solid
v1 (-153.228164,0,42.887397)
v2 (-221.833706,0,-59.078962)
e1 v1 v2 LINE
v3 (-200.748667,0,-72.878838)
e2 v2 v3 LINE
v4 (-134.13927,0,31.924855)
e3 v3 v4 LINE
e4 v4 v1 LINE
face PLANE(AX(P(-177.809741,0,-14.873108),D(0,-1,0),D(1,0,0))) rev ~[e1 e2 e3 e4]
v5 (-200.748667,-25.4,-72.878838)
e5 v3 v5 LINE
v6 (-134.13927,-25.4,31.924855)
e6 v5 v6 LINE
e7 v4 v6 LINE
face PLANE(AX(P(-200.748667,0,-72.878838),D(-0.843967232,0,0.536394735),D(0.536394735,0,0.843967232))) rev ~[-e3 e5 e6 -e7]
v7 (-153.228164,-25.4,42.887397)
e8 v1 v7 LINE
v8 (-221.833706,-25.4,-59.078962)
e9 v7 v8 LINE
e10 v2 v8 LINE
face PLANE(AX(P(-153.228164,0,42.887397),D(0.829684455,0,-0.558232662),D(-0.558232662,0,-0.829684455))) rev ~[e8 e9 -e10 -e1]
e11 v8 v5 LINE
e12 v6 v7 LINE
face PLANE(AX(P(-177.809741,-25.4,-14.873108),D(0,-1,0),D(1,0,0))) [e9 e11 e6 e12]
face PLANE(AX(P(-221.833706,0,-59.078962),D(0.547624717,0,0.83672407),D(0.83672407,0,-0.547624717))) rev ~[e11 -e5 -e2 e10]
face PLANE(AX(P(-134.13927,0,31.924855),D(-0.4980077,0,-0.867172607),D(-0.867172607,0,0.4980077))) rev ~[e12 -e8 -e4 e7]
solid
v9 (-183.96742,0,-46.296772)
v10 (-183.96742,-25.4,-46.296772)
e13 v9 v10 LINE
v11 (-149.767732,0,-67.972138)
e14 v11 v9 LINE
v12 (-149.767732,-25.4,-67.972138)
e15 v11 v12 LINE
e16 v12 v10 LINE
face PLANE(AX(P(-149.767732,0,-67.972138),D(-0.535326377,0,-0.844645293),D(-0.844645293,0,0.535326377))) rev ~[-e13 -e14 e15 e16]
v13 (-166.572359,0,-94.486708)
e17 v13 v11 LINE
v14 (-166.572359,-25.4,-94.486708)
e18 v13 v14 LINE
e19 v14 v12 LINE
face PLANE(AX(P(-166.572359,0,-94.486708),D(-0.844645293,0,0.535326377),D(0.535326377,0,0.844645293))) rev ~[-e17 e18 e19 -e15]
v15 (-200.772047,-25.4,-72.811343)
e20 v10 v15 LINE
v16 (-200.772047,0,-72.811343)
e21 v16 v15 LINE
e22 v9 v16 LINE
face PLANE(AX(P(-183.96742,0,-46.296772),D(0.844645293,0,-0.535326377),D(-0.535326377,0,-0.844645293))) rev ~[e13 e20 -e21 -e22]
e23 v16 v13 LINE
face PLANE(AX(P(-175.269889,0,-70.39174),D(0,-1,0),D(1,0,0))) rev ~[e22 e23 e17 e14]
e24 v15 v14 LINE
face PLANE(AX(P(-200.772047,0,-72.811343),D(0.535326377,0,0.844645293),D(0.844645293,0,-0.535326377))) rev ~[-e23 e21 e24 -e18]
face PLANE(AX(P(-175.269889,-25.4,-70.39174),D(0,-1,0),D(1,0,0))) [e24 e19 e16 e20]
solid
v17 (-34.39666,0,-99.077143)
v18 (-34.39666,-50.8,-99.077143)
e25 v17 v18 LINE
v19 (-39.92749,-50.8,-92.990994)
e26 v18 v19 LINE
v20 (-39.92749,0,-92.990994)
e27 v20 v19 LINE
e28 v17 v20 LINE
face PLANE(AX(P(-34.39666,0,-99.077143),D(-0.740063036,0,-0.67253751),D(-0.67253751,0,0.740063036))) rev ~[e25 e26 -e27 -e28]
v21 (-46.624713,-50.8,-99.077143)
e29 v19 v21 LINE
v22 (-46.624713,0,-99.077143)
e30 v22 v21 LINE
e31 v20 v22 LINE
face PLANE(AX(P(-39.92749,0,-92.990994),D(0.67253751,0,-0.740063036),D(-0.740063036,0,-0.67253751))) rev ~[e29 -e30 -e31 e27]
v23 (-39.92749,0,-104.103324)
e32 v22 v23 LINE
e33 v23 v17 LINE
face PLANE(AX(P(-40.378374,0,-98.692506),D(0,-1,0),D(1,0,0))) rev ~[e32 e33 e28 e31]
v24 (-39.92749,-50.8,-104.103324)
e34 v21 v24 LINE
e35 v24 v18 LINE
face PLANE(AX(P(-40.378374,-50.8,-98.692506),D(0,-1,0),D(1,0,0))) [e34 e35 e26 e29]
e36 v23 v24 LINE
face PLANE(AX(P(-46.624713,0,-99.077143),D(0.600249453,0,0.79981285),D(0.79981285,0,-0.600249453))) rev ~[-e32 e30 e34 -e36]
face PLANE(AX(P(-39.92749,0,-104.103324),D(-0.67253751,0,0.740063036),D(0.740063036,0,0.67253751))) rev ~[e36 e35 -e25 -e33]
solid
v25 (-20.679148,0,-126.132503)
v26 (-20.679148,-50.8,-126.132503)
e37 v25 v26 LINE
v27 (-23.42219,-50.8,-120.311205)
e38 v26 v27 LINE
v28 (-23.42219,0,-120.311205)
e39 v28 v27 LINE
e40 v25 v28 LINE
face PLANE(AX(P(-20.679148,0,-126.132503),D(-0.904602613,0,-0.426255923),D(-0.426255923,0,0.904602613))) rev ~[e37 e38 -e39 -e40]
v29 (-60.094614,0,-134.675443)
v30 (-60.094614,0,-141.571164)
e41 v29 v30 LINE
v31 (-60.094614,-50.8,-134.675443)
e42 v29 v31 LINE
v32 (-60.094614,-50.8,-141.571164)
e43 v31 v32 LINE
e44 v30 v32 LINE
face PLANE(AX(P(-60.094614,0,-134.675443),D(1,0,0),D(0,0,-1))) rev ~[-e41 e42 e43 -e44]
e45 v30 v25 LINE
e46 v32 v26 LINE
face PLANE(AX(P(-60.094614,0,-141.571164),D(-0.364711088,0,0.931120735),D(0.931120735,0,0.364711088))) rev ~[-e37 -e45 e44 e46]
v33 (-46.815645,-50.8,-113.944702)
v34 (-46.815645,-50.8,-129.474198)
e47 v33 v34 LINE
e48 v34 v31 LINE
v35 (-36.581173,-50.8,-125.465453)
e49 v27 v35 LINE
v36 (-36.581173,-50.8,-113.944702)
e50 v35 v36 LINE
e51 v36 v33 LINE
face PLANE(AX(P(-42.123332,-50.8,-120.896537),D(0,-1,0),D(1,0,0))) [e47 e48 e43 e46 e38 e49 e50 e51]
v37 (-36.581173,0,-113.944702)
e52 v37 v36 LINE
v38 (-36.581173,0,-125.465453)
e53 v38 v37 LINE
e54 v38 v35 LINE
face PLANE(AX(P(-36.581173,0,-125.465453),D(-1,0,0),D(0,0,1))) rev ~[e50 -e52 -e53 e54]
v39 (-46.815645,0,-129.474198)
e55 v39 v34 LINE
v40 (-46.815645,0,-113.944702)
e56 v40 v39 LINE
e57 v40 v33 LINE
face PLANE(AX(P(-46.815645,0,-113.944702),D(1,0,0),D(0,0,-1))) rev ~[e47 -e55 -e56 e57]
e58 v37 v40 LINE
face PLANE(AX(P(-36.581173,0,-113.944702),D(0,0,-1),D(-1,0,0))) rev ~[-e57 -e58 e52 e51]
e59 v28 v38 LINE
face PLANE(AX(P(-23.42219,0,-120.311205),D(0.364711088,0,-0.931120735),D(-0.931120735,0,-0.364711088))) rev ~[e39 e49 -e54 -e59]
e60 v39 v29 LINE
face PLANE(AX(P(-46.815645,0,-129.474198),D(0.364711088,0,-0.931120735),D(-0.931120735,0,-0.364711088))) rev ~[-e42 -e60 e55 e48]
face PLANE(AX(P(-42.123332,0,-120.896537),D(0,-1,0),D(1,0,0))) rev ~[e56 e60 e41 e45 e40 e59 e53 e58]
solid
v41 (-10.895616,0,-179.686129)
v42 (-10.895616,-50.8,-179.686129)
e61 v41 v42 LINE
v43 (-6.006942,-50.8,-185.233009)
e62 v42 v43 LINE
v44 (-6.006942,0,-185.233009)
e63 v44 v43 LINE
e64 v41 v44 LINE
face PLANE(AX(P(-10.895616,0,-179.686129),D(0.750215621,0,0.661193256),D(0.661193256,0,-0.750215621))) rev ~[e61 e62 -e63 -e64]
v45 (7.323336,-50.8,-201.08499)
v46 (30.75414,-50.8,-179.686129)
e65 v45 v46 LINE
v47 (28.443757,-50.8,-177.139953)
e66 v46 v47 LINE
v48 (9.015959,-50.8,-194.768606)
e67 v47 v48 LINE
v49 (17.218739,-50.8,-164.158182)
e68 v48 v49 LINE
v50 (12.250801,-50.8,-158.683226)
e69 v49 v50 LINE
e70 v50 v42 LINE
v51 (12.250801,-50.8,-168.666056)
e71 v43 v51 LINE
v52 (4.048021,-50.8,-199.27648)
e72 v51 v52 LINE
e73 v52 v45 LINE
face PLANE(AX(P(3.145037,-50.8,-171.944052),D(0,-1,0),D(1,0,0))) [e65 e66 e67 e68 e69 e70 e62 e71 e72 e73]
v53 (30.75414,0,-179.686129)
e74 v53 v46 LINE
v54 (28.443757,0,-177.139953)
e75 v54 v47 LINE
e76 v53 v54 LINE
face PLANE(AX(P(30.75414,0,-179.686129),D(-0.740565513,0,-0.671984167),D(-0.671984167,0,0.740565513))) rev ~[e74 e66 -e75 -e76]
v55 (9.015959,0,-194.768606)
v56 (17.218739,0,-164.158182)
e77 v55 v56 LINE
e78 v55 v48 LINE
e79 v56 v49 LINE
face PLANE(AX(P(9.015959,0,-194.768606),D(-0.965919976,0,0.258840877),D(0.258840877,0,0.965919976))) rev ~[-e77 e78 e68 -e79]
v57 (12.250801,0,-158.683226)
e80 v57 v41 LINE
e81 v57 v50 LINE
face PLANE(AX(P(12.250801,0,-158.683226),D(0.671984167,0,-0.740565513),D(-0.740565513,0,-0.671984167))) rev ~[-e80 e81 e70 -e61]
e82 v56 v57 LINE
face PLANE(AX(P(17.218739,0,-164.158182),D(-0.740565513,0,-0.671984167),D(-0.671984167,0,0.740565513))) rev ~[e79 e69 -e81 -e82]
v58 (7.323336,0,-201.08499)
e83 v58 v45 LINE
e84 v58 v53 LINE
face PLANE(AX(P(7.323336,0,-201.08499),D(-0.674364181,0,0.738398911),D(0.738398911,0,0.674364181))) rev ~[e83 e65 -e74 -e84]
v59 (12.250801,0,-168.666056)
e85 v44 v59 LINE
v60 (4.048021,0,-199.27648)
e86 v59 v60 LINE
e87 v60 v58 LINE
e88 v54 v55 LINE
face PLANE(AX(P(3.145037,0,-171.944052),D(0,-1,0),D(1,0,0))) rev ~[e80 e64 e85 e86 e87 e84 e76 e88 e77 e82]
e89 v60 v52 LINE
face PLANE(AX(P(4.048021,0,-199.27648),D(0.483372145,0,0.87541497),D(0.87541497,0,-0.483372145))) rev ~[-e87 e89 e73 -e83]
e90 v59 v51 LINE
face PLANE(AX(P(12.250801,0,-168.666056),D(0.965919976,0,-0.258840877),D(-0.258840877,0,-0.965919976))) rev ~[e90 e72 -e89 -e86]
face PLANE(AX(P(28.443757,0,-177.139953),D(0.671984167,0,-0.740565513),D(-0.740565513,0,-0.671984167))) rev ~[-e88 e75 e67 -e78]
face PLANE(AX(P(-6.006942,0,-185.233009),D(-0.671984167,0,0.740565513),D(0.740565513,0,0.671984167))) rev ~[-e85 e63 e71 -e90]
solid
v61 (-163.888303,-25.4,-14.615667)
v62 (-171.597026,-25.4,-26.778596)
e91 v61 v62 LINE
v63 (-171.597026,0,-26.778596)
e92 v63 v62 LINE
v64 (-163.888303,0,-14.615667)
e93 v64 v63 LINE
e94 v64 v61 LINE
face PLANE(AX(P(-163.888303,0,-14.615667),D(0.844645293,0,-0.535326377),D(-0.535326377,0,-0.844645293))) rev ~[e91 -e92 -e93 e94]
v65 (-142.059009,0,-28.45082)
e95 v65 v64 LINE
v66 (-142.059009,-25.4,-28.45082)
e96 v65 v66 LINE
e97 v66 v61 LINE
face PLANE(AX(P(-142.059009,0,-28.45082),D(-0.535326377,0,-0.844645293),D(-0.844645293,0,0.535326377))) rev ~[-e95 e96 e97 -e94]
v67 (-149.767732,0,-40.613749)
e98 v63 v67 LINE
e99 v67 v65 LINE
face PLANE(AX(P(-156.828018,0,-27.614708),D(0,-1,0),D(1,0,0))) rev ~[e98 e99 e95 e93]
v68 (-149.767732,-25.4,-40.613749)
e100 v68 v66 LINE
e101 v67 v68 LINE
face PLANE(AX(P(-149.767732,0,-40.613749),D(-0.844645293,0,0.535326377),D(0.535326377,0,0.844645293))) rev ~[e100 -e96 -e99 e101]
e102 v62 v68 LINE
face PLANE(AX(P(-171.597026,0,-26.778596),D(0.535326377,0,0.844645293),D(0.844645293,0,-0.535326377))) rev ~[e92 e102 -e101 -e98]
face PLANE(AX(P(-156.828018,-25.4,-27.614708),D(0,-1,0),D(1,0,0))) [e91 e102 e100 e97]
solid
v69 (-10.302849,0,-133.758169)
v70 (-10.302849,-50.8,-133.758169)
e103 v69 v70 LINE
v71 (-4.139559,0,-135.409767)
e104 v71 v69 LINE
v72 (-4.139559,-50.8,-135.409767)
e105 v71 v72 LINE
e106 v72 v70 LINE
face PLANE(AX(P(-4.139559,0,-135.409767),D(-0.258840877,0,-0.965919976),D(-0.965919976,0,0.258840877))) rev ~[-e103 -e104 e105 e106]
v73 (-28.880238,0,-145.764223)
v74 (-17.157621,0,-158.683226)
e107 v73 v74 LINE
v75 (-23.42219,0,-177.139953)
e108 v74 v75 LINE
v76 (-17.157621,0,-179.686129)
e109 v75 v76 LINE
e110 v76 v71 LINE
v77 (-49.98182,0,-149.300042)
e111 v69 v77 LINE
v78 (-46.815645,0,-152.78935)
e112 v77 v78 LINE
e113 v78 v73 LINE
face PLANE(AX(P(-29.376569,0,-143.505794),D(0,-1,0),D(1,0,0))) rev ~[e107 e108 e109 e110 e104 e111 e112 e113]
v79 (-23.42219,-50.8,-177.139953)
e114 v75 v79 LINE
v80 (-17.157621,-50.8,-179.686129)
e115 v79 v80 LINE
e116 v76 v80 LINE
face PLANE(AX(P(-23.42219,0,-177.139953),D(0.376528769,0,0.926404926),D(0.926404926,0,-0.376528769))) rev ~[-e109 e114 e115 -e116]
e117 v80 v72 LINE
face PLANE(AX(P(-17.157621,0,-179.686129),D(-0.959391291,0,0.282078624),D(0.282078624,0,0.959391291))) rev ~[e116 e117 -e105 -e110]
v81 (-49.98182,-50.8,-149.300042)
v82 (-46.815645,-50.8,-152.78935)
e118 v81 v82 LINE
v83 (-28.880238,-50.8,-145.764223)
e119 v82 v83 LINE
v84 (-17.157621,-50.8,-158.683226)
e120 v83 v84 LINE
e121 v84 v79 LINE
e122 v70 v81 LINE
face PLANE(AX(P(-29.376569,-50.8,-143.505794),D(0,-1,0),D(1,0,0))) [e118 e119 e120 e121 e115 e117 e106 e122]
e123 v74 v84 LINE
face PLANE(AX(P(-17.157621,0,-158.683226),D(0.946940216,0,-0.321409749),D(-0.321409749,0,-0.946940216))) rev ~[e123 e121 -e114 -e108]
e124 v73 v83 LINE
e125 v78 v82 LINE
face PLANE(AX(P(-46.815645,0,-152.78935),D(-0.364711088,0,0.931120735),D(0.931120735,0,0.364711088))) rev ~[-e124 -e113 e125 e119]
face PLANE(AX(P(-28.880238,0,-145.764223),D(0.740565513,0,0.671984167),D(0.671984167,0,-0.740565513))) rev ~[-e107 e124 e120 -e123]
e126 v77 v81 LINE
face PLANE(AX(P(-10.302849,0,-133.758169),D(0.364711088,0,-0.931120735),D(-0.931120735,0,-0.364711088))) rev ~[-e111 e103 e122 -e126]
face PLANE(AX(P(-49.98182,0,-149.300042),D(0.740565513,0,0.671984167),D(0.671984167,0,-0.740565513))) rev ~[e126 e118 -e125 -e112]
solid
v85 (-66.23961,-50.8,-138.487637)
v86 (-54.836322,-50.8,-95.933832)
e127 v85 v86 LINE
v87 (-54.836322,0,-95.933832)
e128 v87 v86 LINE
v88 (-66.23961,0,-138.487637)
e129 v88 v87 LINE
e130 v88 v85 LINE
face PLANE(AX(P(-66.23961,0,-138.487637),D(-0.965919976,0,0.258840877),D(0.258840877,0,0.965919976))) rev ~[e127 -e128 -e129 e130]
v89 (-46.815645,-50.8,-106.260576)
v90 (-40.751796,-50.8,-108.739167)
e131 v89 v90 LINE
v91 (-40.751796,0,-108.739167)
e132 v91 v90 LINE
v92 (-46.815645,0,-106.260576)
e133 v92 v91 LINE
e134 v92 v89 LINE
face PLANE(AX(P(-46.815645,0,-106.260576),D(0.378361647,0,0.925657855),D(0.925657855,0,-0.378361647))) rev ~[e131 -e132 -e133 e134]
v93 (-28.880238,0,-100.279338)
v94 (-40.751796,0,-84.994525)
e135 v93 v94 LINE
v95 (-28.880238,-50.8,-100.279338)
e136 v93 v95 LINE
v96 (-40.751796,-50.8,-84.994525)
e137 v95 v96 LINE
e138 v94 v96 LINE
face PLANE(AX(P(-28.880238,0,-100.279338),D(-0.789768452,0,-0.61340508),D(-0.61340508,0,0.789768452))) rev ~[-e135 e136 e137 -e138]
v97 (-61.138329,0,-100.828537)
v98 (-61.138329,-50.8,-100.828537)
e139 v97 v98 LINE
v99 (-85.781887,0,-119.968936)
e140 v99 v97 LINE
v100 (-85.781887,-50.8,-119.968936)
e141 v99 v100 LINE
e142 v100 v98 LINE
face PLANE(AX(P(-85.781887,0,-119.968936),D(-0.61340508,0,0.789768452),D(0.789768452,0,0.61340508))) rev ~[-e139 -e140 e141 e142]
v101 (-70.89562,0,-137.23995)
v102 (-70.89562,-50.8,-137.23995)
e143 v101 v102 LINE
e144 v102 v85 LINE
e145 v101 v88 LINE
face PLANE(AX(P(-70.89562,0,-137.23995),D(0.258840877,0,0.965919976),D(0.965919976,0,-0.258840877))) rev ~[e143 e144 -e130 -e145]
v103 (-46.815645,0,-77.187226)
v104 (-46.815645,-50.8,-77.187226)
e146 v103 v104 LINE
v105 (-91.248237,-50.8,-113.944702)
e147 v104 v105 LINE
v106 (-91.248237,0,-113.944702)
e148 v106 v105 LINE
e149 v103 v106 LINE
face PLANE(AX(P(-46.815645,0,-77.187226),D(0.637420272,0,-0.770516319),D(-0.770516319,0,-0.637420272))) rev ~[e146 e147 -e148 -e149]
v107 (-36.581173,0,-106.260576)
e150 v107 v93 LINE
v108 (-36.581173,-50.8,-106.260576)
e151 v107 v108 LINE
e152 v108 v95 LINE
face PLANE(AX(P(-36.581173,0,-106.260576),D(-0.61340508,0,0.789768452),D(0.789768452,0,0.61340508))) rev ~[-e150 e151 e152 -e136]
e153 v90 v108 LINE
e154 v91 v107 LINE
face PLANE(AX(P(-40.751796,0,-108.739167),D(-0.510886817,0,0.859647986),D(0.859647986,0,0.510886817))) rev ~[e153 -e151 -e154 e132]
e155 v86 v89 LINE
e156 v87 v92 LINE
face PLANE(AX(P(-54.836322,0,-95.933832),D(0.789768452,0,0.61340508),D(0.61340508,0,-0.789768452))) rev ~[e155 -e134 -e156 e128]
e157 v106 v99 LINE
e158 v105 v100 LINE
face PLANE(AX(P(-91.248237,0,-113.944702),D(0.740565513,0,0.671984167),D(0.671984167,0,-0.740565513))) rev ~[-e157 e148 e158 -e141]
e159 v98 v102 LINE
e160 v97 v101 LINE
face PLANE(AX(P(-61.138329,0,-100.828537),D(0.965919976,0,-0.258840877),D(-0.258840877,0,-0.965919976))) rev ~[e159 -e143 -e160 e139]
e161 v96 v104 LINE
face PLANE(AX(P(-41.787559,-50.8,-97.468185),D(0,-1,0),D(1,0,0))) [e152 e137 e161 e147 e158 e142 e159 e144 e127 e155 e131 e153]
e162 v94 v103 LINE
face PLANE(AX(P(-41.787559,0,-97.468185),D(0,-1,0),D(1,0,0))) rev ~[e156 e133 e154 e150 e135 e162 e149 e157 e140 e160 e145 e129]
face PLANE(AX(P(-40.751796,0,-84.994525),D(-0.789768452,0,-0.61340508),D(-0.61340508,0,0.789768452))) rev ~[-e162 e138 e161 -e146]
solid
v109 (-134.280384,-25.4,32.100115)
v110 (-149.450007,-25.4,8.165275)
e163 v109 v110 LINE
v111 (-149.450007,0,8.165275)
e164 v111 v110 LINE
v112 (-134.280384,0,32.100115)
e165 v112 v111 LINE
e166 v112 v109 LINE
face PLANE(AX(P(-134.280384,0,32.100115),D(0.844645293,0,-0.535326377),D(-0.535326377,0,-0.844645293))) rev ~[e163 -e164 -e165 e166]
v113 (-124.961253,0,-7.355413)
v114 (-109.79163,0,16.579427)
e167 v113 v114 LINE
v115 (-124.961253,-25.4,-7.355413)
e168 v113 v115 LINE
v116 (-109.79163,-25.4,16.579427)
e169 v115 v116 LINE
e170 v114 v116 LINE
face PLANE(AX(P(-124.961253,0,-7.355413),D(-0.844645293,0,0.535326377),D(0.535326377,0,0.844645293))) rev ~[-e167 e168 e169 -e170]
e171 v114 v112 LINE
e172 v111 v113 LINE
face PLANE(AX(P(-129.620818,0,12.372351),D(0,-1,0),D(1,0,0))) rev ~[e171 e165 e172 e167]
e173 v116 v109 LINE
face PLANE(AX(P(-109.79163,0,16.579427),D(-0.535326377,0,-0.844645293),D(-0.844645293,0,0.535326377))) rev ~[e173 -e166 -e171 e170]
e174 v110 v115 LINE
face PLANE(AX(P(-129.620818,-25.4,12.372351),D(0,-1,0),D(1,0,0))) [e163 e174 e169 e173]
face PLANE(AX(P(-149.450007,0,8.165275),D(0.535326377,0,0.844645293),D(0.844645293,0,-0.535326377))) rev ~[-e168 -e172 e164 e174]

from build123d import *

# Parameters (mm, degrees)
F2_DEPTH = 25.4
F5_DEPTH = 50.8


with BuildPart() as f2:
    # F1 (on Front) → F2 (new body)
    with BuildSketch(Plane.XZ):
        Polygon((-200.7486671209, -72.8788375854), (-134.1392695904, 31.924854964), (-153.2281637192, 42.8873971105), (-221.8337059021, -59.0789616108), align=None)
    extrude(amount=F2_DEPTH)


with BuildPart() as f2b:
    # F0 (on Front) → F2, piece 2 (new body)
    with BuildSketch(Plane.XZ):
        Polygon((-134.2803835869, 32.1001149714), (-149.450007216, 8.1652749375), (-124.9612532579, -7.3554129034), (-109.7916296289, 16.5794271305), align=None)
    extrude(amount=F2_DEPTH)


with BuildPart() as f2c:
    # F0 (on Front) → F2, piece 3 (new body)
    with BuildSketch(Plane.XZ):
        Polygon((-142.0590088453, -28.450820074), (-163.8883034377, -14.6156666915), (-171.5970264872, -26.7785955529), (-149.7677318947, -40.6137489354), align=None)
    extrude(amount=F2_DEPTH)


with BuildPart() as f2d:
    # F0 (on Front) → F2, piece 4 (new body)
    with BuildSketch(Plane.XZ):
        Polygon((-149.7677318947, -67.9721375065), (-183.9674201976, -46.2967722627), (-200.7720470428, -72.8113427758), (-166.57235874, -94.4867080196), align=None)
    extrude(amount=F2_DEPTH)


with BuildPart() as f5:
    # F3 (on Front) → F5 (new body)
    with BuildSketch(Plane.XZ):
        Polygon((17.2187387786, -164.1581819836), (12.250800617, -158.6832260941), (-10.8956162127, -179.6861290932), (-6.0069423464, -185.2330088712), (12.250800617, -168.6660556679), align=None)
        Polygon((28.4437571682, -177.1399527788), (9.0159587106, -194.7686064703), (7.3233359407, -201.084989581), (30.7541404358, -179.6861290932), align=None)
        Polygon((9.0159587106, -194.7686064703), (17.2187387786, -164.1581819836), (12.250800617, -168.6660556679), (4.0480205491, -199.2764801546), align=None)
        Polygon((7.3233359407, -201.084989581), (9.0159587106, -194.7686064703), (4.0480205491, -199.2764801546), align=None)
    extrude(amount=F5_DEPTH)


with BuildPart() as f5b:
    # F3 (on Front) → F5, piece 2 (new body)
    with BuildSketch(Plane.XZ):
        Polygon((-28.8802379445, -100.2793381423), (-40.7517962158, -84.9945247173), (-54.8363216213, -95.9338315591), (-46.8156449497, -106.2605758387), (-40.7517962158, -108.7391674519), (-36.5811732513, -106.2605758387), align=None)
        Polygon((-66.2396103144, -138.487637043), (-54.8363216213, -95.9338315591), (-61.1383294086, -100.8285365577), (-70.8956203459, -137.2399501218), align=None)
        Polygon((-54.8363216213, -95.9338315591), (-40.7517962158, -84.9945247173), (-46.8156449497, -77.1872264321), (-91.2482365966, -113.9447018504), (-85.7818871737, -119.9689358473), (-61.1383294086, -100.8285365577), (-60.0946135819, -96.9336881972), align=None)
        Polygon((-61.1383294086, -100.8285365577), (-54.8363216213, -95.9338315591), (-60.0946135819, -96.9336881972), align=None)
    extrude(amount=F5_DEPTH)


with BuildPart() as f5c:
    # F3 (on Front) → F5, piece 3 (new body)
    with BuildSketch(Plane.XZ):
        Polygon((-46.8156449497, -129.4741981435), (-36.5811732513, -125.4654534497), (-36.5811732513, -113.9447018504), (-46.8156449497, -113.9447018504), (-46.8156449497, -120.3112053809), align=None)
        Polygon((-60.0946135819, -141.5711641312), (-20.6791479141, -126.1325031519), (-23.4221895759, -120.3112053809), (-36.5811732513, -125.4654534497), (-46.8156449497, -129.4741981435), (-60.0946135819, -134.6754431725), align=None)
    extrude(amount=F5_DEPTH)


with BuildPart() as f5d:
    # F3 (on Front) → F5, piece 4 (new body)
    with BuildSketch(Plane.XZ):
        Polygon((-28.8802379445, -145.7642225958), (-10.3028491139, -138.487637043), (-10.3028491139, -133.7581687008), (-49.9818195821, -149.3000419905), (-46.8156449497, -152.7893500067), align=None)
        Polygon((-17.157621035, -158.6832260941), (-10.3028491139, -138.487637043), (-28.8802379445, -145.7642225958), align=None)
        Polygon((-10.3028491139, -133.7581687008), (-10.3028491139, -138.487637043), (-17.157621035, -158.6832260941), (-23.4221895759, -177.1399527788), (-17.157621035, -179.6861290932), (-4.1395589314, -135.4097666355), align=None)
    extrude(amount=F5_DEPTH)


with BuildPart() as f5e:
    # F4 (on Front) → F5, piece 5 (new body)
    with BuildSketch(Plane.XZ):
        Polygon((-34.3966597908, -99.0771427751), (-39.9274900556, -92.9909944534), (-46.624712646, -99.0771427751), (-39.9274900556, -104.1033238342), align=None)
    extrude(amount=F5_DEPTH)


solid = Compound([f2.part, f2b.part, f2c.part, f2d.part, f5.part, f5b.part, f5c.part, f5d.part, f5e.part])
